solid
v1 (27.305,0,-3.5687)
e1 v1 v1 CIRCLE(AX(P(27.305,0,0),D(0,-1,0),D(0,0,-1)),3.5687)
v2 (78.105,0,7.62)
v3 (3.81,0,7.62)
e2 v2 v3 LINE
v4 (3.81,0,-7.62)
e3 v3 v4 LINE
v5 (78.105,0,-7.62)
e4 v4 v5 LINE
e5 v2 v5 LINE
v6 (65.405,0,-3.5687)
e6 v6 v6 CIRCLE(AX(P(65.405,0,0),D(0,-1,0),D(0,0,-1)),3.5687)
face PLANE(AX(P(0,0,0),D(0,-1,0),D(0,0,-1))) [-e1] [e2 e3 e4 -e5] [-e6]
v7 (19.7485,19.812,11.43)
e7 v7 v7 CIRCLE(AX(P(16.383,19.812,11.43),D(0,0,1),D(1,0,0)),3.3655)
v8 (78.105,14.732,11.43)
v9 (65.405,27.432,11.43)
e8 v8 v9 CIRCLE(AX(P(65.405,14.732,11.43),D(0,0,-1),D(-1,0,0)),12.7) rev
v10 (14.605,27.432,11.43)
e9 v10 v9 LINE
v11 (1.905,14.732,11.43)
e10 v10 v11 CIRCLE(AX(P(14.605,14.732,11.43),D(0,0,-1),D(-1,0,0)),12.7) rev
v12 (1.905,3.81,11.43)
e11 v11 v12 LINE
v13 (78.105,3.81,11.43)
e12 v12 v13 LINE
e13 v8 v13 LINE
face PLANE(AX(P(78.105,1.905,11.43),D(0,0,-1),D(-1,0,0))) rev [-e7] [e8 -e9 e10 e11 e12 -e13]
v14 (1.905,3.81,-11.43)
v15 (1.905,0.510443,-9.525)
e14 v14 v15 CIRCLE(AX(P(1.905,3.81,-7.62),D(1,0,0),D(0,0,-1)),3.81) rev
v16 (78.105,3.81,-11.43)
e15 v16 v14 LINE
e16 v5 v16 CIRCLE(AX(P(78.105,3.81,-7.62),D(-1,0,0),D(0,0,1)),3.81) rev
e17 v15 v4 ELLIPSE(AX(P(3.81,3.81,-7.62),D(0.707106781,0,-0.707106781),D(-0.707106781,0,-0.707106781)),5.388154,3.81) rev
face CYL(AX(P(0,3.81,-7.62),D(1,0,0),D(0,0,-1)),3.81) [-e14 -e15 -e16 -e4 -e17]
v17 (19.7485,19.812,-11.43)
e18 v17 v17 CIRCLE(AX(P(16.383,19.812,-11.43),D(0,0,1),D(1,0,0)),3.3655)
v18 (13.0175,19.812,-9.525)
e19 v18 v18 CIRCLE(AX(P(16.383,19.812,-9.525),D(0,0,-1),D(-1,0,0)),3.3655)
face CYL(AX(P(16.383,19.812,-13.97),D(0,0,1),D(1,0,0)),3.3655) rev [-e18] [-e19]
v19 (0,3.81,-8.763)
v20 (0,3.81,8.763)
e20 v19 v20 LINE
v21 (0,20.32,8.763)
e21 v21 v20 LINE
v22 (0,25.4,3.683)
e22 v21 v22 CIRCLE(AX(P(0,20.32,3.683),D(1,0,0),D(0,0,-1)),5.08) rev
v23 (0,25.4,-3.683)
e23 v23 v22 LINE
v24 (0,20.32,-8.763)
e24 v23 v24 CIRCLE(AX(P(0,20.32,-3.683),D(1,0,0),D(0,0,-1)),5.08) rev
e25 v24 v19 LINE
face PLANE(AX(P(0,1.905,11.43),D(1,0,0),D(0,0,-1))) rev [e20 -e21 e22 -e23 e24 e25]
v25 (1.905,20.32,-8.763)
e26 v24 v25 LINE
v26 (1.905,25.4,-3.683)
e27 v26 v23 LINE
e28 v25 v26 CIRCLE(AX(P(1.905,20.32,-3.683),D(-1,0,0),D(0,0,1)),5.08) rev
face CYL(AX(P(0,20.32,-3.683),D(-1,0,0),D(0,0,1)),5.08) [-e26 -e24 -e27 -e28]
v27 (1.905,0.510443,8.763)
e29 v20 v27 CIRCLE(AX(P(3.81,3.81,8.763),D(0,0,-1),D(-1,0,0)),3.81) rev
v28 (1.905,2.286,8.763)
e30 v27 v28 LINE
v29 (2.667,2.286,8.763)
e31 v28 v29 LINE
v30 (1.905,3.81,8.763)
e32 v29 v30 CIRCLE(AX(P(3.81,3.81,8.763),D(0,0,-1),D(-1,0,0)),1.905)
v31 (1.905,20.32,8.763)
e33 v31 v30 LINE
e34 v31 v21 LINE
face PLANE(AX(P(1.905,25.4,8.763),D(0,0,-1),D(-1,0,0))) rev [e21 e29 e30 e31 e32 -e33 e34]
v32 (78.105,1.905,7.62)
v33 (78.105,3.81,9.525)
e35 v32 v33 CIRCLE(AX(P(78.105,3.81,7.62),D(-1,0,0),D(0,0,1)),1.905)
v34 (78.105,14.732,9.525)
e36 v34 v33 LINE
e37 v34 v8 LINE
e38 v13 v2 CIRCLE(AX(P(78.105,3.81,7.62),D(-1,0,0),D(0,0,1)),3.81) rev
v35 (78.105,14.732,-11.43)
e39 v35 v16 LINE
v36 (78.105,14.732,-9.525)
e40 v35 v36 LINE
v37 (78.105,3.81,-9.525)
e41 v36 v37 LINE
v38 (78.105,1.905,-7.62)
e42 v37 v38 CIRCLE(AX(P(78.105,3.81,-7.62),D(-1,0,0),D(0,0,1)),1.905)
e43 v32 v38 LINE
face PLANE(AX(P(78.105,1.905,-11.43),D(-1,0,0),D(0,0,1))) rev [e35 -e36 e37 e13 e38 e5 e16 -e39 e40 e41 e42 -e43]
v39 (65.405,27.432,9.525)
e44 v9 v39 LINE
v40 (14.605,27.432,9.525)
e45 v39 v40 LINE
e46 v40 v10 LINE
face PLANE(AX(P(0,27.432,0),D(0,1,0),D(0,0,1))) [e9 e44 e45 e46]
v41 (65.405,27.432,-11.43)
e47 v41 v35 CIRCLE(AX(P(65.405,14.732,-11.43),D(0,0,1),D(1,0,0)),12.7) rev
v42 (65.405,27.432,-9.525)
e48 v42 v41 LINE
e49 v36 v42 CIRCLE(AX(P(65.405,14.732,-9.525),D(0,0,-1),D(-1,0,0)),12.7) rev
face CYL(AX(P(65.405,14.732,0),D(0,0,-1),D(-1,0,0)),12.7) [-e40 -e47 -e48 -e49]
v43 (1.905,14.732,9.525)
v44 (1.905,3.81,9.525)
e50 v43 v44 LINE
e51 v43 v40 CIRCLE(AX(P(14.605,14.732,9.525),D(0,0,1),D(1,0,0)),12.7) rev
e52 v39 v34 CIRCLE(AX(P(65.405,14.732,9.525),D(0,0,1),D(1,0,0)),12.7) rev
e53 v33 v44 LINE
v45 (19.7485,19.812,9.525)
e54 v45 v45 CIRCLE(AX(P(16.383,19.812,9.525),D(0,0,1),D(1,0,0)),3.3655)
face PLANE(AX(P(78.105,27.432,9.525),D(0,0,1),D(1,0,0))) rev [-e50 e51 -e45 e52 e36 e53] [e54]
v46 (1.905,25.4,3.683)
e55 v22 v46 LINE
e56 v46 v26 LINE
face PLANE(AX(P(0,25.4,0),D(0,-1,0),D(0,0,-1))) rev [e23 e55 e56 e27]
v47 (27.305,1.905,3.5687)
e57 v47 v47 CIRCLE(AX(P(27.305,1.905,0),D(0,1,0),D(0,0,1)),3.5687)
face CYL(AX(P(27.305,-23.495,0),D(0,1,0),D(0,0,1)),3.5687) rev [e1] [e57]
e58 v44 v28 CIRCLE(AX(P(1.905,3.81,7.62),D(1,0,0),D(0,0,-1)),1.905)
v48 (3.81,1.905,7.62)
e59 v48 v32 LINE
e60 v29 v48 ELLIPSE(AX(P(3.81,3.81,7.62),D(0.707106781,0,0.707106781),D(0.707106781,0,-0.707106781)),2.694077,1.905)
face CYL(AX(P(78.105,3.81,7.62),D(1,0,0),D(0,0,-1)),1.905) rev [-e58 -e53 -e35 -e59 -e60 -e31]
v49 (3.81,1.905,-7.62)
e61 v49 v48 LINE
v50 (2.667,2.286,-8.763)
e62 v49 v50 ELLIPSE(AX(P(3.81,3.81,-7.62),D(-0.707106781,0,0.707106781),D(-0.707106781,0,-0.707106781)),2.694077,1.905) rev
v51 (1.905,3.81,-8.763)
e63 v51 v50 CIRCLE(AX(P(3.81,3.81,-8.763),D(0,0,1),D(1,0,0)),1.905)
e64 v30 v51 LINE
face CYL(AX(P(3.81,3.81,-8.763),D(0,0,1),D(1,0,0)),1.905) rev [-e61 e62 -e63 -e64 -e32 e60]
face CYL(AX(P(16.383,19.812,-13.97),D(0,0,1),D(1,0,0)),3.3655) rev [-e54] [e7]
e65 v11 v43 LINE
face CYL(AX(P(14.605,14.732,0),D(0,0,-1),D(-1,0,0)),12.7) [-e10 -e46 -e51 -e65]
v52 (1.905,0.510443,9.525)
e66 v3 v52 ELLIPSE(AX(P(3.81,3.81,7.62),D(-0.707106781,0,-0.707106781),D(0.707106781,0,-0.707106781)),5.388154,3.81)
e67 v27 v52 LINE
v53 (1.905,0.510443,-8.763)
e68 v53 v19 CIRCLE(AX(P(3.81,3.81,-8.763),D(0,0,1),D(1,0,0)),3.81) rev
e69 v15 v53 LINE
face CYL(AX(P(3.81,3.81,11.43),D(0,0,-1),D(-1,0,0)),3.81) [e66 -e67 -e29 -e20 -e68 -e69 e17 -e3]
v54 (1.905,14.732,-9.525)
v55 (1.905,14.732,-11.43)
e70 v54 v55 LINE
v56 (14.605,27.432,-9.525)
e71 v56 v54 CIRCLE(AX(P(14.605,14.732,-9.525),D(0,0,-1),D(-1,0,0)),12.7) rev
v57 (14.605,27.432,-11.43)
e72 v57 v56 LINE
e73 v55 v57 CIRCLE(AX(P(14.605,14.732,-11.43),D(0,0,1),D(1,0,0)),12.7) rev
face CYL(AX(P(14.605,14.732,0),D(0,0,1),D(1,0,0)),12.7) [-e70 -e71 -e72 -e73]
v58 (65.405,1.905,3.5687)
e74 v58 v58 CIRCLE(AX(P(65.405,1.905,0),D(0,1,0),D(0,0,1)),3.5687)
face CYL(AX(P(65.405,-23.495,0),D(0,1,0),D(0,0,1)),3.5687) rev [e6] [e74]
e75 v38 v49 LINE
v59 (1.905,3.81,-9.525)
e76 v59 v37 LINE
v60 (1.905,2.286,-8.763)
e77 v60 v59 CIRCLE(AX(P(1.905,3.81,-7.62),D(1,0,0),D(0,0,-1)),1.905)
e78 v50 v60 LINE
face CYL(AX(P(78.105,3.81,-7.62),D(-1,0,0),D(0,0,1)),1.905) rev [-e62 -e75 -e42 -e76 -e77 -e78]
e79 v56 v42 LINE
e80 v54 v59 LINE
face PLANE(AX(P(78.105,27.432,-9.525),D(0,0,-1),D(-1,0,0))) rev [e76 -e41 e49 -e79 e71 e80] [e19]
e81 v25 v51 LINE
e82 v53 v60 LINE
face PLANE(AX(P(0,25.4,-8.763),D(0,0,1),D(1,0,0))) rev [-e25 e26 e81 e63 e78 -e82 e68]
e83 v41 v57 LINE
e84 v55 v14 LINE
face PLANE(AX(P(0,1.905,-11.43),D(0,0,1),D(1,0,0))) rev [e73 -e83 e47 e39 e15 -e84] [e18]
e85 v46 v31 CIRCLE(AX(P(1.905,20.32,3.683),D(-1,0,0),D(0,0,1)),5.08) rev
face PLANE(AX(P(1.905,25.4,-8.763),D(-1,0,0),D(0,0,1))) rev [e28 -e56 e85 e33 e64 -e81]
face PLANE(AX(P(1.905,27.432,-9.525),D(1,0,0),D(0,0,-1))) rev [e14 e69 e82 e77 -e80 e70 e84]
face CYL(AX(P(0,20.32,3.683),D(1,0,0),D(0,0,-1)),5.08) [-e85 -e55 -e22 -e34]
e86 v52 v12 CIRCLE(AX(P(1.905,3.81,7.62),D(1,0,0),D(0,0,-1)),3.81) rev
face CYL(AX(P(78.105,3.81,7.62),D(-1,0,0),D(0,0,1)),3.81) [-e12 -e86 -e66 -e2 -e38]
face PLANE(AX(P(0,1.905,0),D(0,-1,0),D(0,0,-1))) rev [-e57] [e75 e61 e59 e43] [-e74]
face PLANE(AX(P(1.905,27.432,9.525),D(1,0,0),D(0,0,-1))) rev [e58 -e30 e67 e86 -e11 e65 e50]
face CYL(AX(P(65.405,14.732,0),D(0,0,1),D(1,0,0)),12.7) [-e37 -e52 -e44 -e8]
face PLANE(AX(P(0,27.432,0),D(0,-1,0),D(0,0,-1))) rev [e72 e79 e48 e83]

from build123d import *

# Parameters (mm, degrees)
SKETCH1_W           = 78.105
SKETCH1_H           = 22.86
BOSS_EXTRUDE1_DEPTH = 1.905
SKETCH2_W           = 76.2
SKETCH2_H           = 1.905
BOSS_EXTRUDE2_DEPTH = 25.527
SKETCH5_W           = 1.905
SKETCH5_H           = 17.526
BOSS_EXTRUDE6_DEPTH = 23.495
SKETCH6_W           = 1.905
SKETCH6_H           = 2.667
CUT_EXTRUDE2_DEPTH  = 25.4
SKETCH7_R           = 3.5687
CUT_EXTRUDE3_DEPTH  = 25.4
SKETCH8_R           = 3.3655
CUT_EXTRUDE4_DEPTH  = 25.4
FILLET1_R           = 12.7
FILLET2_R           = 5.08
FILLET3_R           = 3.81
FILLET4_R           = 1.905
FILLET5_R           = 3.81
FILLET6_START       = 1.905
FILLET6_DEPTH       = 76.2


with BuildPart() as part:
    # Sketch1 → Boss-Extrude1 (new body)
    with BuildSketch(Plane(origin=(0, 0, 0), x_dir=(1, 0, 0), z_dir=(0, 1, 0))):
        with Locations((39.0525, 0)):
            Rectangle(SKETCH1_W, SKETCH1_H)
    extrude(amount=BOSS_EXTRUDE1_DEPTH)

    # Sketch2 → Boss-Extrude2 (add)
    with BuildSketch(Plane(origin=(0, 1.905, 0), x_dir=(1, 0, 0), z_dir=(0, 1, 0))):
        with Locations((40.005, -10.4775)):
            Rectangle(SKETCH2_W, SKETCH2_H)
        with Locations((40.005, 10.4775)):
            Rectangle(SKETCH2_W, SKETCH2_H)
    extrude(amount=BOSS_EXTRUDE2_DEPTH)

    # Sketch5 → Boss-Extrude6 (add)
    with BuildSketch(Plane(origin=(0, 1.905, 0), x_dir=(1, 0, 0), z_dir=(0, 1, 0))):
        with Locations((0.9525, 0)):
            Rectangle(SKETCH5_W, SKETCH5_H)
    extrude(amount=BOSS_EXTRUDE6_DEPTH)

    # Sketch6 → Cut-Extrude2 (cut)
    with BuildSketch(Plane(origin=(0, 1.905, 0), x_dir=(1, 0, 0), z_dir=(0, 1, 0))):
        with Locations((0.9525, -10.0965)):
            Rectangle(SKETCH6_W, SKETCH6_H)
        with Locations((0.9525, 10.0965)):
            Rectangle(SKETCH6_W, SKETCH6_H)
    extrude(amount=-CUT_EXTRUDE2_DEPTH, mode=Mode.SUBTRACT)

    # Sketch7 → Cut-Extrude3 (cut)
    with BuildSketch(Plane(origin=(0, 1.905, 0), x_dir=(1, 0, 0), z_dir=(0, 1, 0))):
        with Locations(Location((65.405, 0, 0), (0, 0, 270))):
            Circle(SKETCH7_R)
        with Locations(Location((27.305, 0, 0), (0, 0, 270))):
            Circle(SKETCH7_R)
    extrude(amount=-CUT_EXTRUDE3_DEPTH, mode=Mode.SUBTRACT)

    # Sketch8 → Cut-Extrude4 (cut)
    with BuildSketch(Plane.XY.offset(11.43)):
        with Locations((16.383, 19.812)):
            Circle(SKETCH8_R)
    extrude(amount=-CUT_EXTRUDE4_DEPTH, mode=Mode.SUBTRACT)

    # Fillet1
    fillet1_edges = [part.edges().sort_by_distance(p)[0] for p in [
        (78.105, 27.432, 10.4775),
        (1.905, 27.432, 10.4775),
        (1.905, 27.432, -10.4775),
        (78.105, 27.432, -10.4775),
    ]]
    fillet(fillet1_edges, radius=FILLET1_R)

    # Fillet2
    fillet2_edges = [part.edges().sort_by_distance(p)[0] for p in [
        (0.9525, 25.4, -8.763),
        (0.9525, 25.4, 8.763),
    ]]
    fillet(fillet2_edges, radius=FILLET2_R)

    # Fillet3
    fillet3_edges = [part.edges().sort_by_distance(p)[0] for p in [
        (0, 0, 0),
    ]]
    fillet(fillet3_edges, radius=FILLET3_R)

    # Fillet4
    fillet4_edges = [part.edges().sort_by_distance(p)[0] for p in [
        (1.905, 1.905, 0),
    ]]
    fillet(fillet4_edges, radius=FILLET4_R)

    # Fillet5
    # the kernel refuses this fillet: 3.81 mm, written as the material it takes off along each edge
    with BuildSketch(Plane(origin=(-5.715, 0, -11.43), x_dir=(0, 0, 1), z_dir=(1, 0, 0))) as fillet5_piece_1:
        with BuildLine():
            CenterArc((FILLET5_R, -FILLET5_R), FILLET5_R, 90, 90)
            Line((0, -FILLET5_R), (0, 0))
            Line((0, 0), (FILLET5_R, 0))
        make_face()
    extrude(amount=93.345, mode=Mode.SUBTRACT)
    with BuildSketch(Plane(origin=(87.63, 0, 11.43), x_dir=(0, 1, 0), z_dir=(-1, 0, 0))) as fillet5_piece_2:
        with BuildLine():
            CenterArc((FILLET5_R, FILLET5_R), FILLET5_R, 180, 90)
            Line((0, FILLET5_R), (0, 0))
            Line((0, 0), (FILLET5_R, 0))
        make_face()
    extrude(amount=93.345, mode=Mode.SUBTRACT)

    # Fillet6: read off the stored shape, not the designer's step
    # Fillet6 outline → Fillet6 (add)
    with BuildSketch(Plane.YZ.offset(FILLET6_START)):
        with BuildLine():
            Line((1.905, -7.62), (1.905, -9.525))
            Line((1.905, -9.525), (3.81, -9.525))
            ThreePointArc((3.81, -9.525), (2.462961582, -8.967038418), (1.905, -7.62))
        make_face()
        with BuildLine():
            Line((3.81, 9.525), (1.905, 9.525))
            Line((1.905, 9.525), (1.905, 7.62))
            ThreePointArc((1.905, 7.62), (2.462961582, 8.967038418), (3.81, 9.525))
        make_face()
    extrude(amount=FILLET6_DEPTH)


solid = part.part
